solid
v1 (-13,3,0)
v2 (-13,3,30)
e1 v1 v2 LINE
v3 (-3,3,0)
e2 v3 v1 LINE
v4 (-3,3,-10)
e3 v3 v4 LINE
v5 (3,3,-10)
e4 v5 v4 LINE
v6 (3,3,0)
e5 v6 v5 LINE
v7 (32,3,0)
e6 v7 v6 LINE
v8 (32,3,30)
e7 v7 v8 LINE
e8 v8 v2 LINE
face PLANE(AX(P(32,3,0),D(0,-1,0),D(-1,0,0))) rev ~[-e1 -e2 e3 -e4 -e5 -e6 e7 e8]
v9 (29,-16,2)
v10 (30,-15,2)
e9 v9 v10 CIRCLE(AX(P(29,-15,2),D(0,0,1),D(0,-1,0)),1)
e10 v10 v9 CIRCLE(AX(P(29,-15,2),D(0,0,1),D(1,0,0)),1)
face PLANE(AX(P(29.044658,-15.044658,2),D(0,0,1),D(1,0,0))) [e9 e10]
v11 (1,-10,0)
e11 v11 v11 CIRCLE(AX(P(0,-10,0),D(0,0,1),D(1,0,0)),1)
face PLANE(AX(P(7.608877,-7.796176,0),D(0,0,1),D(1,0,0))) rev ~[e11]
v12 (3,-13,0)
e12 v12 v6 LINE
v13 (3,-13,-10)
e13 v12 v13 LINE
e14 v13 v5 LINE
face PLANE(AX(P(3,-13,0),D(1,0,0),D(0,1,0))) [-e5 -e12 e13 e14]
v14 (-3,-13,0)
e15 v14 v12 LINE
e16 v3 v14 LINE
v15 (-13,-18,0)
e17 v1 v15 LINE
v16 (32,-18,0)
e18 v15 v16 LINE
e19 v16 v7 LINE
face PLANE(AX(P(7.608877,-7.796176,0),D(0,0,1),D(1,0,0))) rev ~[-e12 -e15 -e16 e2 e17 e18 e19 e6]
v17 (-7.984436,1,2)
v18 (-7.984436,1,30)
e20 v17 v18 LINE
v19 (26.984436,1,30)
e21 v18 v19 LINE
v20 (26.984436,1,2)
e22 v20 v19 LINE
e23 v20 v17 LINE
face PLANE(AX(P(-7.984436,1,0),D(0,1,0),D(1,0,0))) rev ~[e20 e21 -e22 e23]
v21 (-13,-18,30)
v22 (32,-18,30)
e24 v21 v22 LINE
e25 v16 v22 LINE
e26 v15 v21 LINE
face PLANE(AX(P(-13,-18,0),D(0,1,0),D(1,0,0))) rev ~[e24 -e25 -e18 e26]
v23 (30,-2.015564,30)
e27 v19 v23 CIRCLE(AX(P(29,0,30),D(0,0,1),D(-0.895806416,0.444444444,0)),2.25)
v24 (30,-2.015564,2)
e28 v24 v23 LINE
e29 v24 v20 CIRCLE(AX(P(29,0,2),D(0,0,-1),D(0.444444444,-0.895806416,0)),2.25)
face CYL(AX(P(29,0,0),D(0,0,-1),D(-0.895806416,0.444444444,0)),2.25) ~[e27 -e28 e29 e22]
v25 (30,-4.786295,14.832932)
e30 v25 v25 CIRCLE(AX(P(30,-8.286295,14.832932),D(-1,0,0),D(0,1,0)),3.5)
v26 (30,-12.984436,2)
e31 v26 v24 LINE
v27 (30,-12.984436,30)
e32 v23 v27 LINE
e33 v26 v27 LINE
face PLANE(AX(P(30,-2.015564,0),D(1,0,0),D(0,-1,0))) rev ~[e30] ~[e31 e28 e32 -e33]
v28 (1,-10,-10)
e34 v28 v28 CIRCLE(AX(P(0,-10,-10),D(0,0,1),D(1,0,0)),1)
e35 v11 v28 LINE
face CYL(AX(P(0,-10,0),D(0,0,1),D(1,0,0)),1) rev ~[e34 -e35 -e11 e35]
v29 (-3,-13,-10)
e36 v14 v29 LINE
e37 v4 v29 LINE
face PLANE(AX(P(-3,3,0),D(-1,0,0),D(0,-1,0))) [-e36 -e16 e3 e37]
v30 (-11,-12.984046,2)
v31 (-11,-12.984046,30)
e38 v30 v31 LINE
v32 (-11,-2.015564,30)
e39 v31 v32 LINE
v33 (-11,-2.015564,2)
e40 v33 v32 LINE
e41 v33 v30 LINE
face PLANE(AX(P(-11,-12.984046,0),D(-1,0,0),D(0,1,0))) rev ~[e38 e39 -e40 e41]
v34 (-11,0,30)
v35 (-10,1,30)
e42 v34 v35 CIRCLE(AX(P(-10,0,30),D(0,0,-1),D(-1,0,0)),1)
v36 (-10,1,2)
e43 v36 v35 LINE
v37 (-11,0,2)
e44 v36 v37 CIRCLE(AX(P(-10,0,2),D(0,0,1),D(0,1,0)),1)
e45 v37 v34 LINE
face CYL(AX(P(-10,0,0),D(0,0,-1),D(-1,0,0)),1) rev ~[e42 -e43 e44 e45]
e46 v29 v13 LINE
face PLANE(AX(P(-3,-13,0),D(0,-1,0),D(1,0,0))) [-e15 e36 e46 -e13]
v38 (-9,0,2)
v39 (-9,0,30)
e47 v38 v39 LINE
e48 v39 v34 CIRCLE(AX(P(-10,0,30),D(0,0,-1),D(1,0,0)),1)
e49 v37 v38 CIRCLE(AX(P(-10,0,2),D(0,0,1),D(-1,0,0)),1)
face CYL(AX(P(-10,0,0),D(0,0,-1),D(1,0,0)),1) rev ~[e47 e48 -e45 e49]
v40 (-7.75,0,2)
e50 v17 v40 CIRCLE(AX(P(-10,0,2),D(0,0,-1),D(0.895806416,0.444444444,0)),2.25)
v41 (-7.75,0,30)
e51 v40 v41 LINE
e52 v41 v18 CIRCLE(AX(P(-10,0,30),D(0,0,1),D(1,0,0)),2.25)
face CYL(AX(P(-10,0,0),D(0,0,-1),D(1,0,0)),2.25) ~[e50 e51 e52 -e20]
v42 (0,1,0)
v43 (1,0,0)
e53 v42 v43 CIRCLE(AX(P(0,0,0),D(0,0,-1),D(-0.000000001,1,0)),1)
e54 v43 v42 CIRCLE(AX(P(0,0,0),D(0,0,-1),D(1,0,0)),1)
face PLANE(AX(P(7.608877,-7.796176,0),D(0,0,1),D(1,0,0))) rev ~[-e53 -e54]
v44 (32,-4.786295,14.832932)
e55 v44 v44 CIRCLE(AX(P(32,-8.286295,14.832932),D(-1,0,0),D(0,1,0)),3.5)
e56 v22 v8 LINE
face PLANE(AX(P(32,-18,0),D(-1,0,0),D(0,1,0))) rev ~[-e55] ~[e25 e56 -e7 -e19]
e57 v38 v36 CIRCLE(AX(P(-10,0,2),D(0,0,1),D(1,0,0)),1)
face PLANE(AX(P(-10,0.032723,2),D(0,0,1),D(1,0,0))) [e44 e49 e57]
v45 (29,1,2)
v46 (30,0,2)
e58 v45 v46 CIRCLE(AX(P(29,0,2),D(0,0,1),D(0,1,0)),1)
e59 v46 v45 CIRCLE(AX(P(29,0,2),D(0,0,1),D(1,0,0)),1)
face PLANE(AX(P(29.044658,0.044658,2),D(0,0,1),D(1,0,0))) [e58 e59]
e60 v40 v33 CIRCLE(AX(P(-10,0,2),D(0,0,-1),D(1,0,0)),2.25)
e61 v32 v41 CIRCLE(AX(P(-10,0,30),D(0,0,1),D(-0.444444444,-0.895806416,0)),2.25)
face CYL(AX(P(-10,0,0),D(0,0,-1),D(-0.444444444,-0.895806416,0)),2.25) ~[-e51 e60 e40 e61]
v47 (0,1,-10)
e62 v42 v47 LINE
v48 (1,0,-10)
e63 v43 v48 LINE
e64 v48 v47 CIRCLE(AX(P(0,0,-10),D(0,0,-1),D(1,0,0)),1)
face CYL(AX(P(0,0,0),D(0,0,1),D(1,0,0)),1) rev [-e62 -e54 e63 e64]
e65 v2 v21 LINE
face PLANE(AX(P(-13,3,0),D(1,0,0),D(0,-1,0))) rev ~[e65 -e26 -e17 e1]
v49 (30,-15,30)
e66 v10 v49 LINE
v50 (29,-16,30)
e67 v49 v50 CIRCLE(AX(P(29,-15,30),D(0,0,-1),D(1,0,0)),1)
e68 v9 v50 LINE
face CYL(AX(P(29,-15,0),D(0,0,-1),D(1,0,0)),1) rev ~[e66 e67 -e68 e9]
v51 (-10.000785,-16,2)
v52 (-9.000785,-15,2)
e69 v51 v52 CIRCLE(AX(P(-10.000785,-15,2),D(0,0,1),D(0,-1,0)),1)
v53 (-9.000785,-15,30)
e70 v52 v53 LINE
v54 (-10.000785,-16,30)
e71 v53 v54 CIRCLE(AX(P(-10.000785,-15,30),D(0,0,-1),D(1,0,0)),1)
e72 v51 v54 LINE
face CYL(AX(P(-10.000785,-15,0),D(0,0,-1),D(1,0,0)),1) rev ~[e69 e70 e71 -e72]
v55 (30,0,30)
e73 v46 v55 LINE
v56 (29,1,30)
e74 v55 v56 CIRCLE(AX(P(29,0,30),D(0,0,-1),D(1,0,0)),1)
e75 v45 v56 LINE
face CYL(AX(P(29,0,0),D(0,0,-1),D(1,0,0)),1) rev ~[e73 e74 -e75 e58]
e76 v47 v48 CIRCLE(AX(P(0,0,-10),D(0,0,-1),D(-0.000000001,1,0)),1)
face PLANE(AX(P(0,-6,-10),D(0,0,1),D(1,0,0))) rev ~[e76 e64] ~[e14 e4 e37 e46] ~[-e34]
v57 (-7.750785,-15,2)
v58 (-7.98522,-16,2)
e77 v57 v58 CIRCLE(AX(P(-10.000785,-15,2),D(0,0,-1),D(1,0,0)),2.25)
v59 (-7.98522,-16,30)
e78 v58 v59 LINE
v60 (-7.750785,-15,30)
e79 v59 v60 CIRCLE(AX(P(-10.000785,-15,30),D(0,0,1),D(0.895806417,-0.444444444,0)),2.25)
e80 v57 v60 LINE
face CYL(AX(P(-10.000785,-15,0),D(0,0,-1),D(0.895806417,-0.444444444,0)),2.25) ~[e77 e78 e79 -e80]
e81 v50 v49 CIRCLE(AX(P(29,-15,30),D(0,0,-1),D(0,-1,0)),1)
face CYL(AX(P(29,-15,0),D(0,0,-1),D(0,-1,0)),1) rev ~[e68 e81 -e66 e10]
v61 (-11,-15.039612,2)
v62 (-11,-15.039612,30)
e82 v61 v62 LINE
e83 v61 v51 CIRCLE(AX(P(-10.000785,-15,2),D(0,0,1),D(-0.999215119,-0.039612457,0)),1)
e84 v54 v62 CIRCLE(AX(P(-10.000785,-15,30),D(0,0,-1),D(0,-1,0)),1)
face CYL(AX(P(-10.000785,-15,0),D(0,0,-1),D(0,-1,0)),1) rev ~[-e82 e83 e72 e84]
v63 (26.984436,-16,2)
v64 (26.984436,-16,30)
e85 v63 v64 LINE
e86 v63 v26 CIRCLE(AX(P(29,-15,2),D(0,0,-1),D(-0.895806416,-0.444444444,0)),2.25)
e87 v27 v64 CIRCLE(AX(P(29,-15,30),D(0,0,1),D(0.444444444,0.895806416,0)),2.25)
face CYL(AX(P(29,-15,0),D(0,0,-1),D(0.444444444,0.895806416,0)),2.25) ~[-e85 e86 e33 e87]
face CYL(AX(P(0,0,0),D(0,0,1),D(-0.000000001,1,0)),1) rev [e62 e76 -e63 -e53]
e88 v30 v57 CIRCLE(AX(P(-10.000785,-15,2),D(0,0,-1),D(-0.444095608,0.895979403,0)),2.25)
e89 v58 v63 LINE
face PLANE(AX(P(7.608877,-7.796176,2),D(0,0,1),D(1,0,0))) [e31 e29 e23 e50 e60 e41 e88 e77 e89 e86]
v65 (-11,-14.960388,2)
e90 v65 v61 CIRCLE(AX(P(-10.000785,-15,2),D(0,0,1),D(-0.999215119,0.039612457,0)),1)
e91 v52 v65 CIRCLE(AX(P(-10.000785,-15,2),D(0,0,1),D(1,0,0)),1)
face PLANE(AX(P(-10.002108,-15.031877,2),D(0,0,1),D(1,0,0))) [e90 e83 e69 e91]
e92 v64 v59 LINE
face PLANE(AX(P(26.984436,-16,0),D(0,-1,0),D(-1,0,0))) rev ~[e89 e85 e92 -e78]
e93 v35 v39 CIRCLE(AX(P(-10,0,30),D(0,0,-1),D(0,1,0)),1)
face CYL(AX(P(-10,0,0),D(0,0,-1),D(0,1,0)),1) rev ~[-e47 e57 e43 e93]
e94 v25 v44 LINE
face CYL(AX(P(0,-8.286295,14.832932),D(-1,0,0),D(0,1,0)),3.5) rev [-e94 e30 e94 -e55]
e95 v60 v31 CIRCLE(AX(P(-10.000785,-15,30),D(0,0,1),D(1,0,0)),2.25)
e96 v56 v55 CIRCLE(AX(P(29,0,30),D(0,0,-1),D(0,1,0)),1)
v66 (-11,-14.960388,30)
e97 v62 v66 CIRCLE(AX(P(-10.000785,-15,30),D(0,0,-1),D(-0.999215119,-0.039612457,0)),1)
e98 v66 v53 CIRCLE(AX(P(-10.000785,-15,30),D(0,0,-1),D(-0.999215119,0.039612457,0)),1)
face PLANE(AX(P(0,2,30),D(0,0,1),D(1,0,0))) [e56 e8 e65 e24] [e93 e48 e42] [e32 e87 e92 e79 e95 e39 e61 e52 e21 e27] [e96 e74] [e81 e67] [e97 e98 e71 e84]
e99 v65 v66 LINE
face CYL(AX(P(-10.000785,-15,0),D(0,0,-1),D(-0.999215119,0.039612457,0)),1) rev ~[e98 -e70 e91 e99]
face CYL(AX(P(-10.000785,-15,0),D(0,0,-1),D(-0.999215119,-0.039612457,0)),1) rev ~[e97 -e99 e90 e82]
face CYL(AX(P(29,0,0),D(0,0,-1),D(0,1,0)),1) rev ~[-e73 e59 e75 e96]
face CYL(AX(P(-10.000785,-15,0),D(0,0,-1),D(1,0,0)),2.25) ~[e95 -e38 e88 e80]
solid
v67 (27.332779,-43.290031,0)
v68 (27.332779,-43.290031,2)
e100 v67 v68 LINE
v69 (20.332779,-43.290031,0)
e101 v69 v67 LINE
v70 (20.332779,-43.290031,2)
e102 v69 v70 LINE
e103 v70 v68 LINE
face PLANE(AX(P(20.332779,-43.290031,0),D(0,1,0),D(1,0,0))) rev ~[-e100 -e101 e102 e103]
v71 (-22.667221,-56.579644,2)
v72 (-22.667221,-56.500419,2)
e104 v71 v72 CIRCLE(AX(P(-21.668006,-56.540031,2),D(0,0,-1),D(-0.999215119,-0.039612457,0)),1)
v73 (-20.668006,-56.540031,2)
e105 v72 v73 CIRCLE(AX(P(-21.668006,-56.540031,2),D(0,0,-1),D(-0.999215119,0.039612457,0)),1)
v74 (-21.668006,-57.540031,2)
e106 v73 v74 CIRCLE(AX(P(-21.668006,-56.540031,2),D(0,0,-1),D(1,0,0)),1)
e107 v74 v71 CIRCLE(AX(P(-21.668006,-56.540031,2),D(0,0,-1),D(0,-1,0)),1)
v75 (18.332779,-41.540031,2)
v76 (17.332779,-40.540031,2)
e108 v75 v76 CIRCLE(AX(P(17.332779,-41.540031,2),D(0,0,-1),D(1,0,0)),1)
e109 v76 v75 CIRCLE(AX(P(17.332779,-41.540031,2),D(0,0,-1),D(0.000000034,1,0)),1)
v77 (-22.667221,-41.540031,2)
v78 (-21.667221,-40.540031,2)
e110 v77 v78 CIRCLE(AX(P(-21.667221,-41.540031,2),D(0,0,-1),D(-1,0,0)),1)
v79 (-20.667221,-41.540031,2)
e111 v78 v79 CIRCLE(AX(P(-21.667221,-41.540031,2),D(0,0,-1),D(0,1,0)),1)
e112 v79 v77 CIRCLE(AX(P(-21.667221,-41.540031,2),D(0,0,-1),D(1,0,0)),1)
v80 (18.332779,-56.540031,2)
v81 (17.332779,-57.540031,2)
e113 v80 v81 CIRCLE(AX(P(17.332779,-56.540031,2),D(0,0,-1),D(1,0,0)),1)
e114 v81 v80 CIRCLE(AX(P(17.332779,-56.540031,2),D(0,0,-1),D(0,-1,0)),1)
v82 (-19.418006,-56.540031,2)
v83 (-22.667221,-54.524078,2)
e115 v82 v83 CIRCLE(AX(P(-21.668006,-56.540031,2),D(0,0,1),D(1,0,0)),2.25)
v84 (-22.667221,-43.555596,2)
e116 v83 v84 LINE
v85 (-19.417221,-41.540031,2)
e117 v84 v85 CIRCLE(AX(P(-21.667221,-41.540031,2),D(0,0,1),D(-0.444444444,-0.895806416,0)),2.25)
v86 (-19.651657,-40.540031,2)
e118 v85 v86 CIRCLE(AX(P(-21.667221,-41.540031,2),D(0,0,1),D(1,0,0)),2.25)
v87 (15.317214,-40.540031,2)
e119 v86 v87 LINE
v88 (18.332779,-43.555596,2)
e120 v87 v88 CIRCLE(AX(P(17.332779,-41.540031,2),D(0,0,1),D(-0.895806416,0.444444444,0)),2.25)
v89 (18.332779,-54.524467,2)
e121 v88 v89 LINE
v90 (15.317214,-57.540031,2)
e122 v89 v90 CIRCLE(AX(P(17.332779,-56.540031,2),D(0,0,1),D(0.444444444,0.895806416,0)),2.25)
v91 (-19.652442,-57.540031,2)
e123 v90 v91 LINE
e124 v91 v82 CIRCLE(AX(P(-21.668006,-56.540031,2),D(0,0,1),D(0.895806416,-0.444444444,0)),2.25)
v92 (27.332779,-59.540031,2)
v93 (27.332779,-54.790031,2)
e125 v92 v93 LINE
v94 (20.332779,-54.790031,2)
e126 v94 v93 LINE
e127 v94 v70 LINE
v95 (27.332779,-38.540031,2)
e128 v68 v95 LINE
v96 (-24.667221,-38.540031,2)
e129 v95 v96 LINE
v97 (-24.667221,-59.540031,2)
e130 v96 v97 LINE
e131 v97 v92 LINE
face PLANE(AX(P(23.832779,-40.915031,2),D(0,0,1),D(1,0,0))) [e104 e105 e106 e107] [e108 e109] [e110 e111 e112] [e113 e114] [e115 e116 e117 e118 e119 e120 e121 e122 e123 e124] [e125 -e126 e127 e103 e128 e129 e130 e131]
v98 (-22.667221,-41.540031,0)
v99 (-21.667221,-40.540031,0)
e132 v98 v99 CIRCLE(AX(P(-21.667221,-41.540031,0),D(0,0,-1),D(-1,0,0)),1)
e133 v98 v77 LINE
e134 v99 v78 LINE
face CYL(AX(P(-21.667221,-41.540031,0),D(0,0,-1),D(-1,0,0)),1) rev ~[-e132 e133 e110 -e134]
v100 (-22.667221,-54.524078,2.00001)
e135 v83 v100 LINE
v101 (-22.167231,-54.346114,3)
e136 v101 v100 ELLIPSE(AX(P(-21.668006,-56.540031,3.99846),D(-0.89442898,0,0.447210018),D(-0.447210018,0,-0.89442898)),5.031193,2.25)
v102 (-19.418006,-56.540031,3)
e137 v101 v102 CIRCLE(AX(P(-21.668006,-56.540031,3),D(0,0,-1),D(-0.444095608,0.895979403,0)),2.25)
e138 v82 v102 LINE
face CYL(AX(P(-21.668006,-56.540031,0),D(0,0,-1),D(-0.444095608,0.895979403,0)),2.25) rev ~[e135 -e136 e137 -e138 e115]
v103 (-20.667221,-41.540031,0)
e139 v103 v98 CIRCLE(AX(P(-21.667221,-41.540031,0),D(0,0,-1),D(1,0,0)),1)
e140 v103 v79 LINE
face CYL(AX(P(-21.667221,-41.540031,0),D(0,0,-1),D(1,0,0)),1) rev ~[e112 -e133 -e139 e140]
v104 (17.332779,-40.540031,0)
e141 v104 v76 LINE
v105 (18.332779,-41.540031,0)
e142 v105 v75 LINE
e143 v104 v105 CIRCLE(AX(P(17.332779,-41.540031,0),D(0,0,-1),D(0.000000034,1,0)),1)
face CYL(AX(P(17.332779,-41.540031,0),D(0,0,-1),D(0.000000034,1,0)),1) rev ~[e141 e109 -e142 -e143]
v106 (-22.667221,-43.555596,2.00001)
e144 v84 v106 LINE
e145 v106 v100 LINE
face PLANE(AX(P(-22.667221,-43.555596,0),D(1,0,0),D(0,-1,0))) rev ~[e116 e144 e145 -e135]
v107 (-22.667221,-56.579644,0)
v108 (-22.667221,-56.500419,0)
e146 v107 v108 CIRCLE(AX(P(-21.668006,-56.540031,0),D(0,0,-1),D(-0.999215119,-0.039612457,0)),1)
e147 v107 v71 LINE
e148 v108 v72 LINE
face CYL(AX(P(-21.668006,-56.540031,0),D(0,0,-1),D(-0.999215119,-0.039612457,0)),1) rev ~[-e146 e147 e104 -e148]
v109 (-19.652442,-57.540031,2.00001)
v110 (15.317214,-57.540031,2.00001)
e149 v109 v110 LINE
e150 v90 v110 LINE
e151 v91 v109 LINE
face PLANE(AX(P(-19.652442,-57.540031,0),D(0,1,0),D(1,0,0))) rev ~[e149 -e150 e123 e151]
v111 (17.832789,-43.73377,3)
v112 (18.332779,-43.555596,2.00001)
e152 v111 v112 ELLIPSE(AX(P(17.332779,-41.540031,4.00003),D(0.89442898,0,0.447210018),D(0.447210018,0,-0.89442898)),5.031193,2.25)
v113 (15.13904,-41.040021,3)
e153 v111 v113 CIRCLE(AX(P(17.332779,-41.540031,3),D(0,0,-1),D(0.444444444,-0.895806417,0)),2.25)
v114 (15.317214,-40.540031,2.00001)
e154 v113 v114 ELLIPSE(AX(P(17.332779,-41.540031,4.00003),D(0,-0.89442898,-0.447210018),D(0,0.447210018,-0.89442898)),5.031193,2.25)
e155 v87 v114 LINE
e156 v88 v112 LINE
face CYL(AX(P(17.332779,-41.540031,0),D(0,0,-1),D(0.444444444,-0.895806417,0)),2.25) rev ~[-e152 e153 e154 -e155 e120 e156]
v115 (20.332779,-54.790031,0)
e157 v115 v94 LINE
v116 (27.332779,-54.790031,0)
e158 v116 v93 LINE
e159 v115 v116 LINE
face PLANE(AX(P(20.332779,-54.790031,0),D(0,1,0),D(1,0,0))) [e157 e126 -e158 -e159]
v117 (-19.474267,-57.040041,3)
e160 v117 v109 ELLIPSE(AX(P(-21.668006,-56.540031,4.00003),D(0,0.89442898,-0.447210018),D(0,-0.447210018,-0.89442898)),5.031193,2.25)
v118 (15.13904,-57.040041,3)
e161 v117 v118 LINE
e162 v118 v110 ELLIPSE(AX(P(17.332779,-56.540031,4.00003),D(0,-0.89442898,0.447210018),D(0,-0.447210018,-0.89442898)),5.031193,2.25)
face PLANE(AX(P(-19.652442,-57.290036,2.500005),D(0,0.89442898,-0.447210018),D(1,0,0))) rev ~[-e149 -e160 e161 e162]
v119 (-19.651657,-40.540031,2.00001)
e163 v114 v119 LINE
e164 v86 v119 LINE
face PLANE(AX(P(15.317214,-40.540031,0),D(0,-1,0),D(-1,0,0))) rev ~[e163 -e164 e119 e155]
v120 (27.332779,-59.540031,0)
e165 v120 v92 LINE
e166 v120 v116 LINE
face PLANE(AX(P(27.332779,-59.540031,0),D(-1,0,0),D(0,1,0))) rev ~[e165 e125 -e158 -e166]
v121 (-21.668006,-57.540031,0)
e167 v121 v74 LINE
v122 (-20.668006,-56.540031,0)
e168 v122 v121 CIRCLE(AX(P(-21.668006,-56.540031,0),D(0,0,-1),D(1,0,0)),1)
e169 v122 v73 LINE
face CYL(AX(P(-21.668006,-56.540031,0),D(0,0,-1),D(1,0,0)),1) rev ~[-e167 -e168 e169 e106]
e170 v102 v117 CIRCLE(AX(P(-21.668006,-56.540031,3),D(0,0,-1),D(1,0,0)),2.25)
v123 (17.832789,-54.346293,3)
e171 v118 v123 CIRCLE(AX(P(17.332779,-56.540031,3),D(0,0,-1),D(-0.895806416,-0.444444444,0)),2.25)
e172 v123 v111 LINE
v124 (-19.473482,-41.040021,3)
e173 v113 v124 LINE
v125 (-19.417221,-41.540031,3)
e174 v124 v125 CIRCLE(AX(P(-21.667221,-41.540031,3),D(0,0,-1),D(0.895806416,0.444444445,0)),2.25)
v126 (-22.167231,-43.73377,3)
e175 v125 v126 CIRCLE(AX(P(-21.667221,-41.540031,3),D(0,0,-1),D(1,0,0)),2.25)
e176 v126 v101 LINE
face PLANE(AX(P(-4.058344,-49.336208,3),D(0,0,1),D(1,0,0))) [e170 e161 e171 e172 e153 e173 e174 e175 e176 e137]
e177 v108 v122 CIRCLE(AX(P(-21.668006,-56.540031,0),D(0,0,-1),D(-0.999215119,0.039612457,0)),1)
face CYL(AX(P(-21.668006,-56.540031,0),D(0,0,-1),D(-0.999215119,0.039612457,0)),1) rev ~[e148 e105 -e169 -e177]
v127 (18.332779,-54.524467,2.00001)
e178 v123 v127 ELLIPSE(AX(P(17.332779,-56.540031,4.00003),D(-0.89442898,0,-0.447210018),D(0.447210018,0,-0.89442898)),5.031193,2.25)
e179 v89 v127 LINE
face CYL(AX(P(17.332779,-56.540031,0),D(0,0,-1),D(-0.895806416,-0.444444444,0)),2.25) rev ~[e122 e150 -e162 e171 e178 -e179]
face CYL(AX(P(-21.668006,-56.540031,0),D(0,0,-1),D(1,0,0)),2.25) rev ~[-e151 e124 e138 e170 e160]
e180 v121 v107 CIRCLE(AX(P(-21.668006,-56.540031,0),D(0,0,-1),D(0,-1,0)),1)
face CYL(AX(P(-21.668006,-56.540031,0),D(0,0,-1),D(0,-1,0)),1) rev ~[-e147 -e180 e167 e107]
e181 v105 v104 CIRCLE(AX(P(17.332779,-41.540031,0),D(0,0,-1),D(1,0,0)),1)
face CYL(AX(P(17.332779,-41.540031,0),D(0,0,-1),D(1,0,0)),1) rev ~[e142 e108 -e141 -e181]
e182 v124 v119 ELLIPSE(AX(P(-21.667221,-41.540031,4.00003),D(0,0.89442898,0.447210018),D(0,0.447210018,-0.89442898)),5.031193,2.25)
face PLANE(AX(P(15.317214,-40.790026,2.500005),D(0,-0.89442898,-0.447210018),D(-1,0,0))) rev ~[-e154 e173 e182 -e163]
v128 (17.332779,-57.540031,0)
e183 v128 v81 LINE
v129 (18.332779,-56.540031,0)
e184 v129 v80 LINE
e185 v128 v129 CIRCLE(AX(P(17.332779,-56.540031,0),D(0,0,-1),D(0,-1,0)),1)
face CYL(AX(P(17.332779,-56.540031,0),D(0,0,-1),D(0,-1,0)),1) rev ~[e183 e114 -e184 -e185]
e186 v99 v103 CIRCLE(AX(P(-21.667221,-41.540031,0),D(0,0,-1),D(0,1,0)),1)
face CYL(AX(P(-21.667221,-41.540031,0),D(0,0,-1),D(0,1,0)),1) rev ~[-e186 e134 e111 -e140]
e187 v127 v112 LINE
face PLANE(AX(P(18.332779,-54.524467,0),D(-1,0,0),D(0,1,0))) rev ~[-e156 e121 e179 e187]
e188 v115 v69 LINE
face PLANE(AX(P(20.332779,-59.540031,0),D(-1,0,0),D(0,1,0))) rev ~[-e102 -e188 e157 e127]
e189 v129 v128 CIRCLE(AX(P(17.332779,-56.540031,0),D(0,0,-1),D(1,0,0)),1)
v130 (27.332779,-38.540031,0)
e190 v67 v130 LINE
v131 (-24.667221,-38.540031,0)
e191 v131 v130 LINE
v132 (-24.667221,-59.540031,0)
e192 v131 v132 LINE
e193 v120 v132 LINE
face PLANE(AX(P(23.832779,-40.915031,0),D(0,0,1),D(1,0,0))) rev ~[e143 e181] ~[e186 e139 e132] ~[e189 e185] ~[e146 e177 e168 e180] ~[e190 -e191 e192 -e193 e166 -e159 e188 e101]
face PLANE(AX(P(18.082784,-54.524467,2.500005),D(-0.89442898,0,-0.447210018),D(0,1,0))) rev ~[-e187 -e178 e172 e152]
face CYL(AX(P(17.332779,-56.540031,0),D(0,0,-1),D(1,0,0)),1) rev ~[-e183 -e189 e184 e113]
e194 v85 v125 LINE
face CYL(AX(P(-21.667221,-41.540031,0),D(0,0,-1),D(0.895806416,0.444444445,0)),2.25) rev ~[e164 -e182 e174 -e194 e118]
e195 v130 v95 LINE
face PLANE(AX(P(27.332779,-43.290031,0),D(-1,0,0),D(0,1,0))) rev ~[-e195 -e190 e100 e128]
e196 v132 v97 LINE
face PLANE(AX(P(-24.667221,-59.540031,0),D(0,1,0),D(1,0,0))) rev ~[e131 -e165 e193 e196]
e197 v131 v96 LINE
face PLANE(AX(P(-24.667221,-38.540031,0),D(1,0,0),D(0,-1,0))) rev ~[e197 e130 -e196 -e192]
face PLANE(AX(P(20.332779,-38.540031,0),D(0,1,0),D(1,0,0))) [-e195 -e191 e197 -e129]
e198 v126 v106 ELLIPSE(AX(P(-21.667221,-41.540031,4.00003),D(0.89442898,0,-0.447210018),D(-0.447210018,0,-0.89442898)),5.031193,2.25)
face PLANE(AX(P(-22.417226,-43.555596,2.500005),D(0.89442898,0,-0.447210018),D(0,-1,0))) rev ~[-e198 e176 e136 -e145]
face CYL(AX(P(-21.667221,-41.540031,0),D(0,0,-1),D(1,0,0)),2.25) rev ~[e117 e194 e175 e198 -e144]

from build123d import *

# Parameters (mm, degrees)
F1_DEPTH = 30
F0_R     = 1
F2_DEPTH = 2
F3_DEPTH = 10
F4_DEPTH = 2
F5_DEPTH = 3
F6_SIZE2 = 0.99999
F6_SIZE  = 0.49999
F7_R     = 3.5
F8_DEPTH = 40
F0_W     = 7
F0_H     = 4.75
F9_DEPTH = 2


# Not quite as in the source:
# - a fillet or chamfer is up to 0.001 mm smaller than in the source, because OpenCascade refuses the exact size


with BuildPart() as f1:
    # F0 (on Top) → F1 (new body)
    with BuildSketch(Plane.XY):
        Polygon((-3, 1), (-1.2e-09, 1), (3, 1), (3, 3), (-3, 3), align=None)
        with BuildLine():
            Line((-7.9844355629, 1), (-3, 1))
            Line((-3, 1), (-3, 3))
            Line((-3, 3), (-13, 3))
            Line((-13, 3), (-13, -18))
            Line((-13, -18), (32, -18))
            Line((32, -18), (32, 3))
            Line((32, 3), (3, 3))
            Line((3, 3), (3, 1))
            Line((3, 1), (26.9844355629, 1))
            ThreePointArc((26.9844355629, 1), (29.5135562367, 2.1906072199), (31.25, 0))
            ThreePointArc((31.25, 0), (30.9121323176, -1.1858541226), (30, -2.0155644371))
            Line((30, -2.0155644371), (30, -12.9844355629))
            ThreePointArc((30, -12.9844355629), (30.9121323176, -13.8141458774), (31.25, -15))
            ThreePointArc((31.25, -15), (29.5135562367, -17.1906072199), (26.9844355629, -16))
            Line((26.9844355629, -16), (-7.9852204443, -16))
            ThreePointArc((-7.9852204443, -16), (-11.592084853, -16.5906804835), (-11, -12.9840463431))
            Line((-11, -12.9840463431), (-11, -2.0155644371))
            ThreePointArc((-11, -2.0155644371), (-11.5909902577, 1.5909902577), (-7.9844355629, 1))
        make_face()
        with BuildLine():
            ThreePointArc((-7.75, 0), (-7.8093927801, 0.5135562367), (-7.9844355629, 1))
            Line((-7.9844355629, 1), (-10, 1))
            ThreePointArc((-10, 1), (-9.2928932188, 0.7071067812), (-9, 0))
            ThreePointArc((-9, 0), (-10, -1), (-11, 0))
            Line((-11, 0), (-11, -2.0155644371))
            ThreePointArc((-11, -2.0155644371), (-8.8141458774, -1.9121323176), (-7.75, 0))
        make_face()
        with BuildLine():
            Line((-10, 1), (-7.9844355629, 1))
            ThreePointArc((-7.9844355629, 1), (-11.5909902577, 1.5909902577), (-11, -2.0155644371))
            Line((-11, -2.0155644371), (-11, 0))
            Line((-11, 0), (-11, 1))
            Line((-11, 1), (-10, 1))
        make_face()
        with BuildLine():
            ThreePointArc((31.25, 0), (29.5135562367, 2.1906072199), (26.9844355629, 1))
            Line((26.9844355629, 1), (29, 1))
            Line((29, 1), (30, 1))
            Line((30, 1), (30, 0))
            Line((30, 0), (30, -2.0155644371))
            ThreePointArc((30, -2.0155644371), (30.9121323176, -1.1858541226), (31.25, 0))
        make_face()
        with BuildLine():
            Line((29, 1), (26.9844355629, 1))
            ThreePointArc((26.9844355629, 1), (27.4090097423, -1.5909902577), (30, -2.0155644371))
            Line((30, -2.0155644371), (30, 0))
            ThreePointArc((30, 0), (28.2928932188, -0.7071067812), (29, 1))
        make_face()
        with BuildLine():
            Line((30, 1), (29, 1))
            ThreePointArc((29, 1), (29.7071067812, 0.7071067812), (30, 0))
            Line((30, 0), (30, 1))
        make_face()
        with BuildLine():
            ThreePointArc((-11, 0), (-10.7071067812, 0.7071067812), (-10, 1))
            Line((-10, 1), (-11, 1))
            Line((-11, 1), (-11, 0))
        make_face()
        with BuildLine():
            ThreePointArc((-10.0007848814, -16), (-10.6937450327, -15.7209758864), (-11, -15.0396124575))
            Line((-11, -15.0396124575), (-11, -16))
            Line((-11, -16), (-10.0007848814, -16))
        make_face()
        with BuildLine():
            Line((-11, -14.9603875425), (-11, -12.9840463431))
            ThreePointArc((-11, -12.9840463431), (-11.592084853, -16.5906804835), (-7.9852204443, -16))
            Line((-7.9852204443, -16), (-10.0007848814, -16))
            Line((-10.0007848814, -16), (-11, -16))
            Line((-11, -16), (-11, -15.0396124575))
            ThreePointArc((-11, -15.0396124575), (-11.0007848814, -15), (-11, -14.9603875425))
        make_face()
        with BuildLine():
            ThreePointArc((-7.7507848814, -15), (-8.8145585153, -13.0880985882), (-11, -12.9840463431))
            Line((-11, -12.9840463431), (-11, -14.9603875425))
            ThreePointArc((-11, -14.9603875425), (-9.9809747651, -14.0001962396), (-9.0007848814, -15))
            ThreePointArc((-9.0007848814, -15), (-9.2936781002, -15.7071067812), (-10.0007848814, -16))
            Line((-10.0007848814, -16), (-7.9852204443, -16))
            ThreePointArc((-7.9852204443, -16), (-7.8101776616, -15.5135562367), (-7.7507848814, -15))
        make_face()
        with BuildLine():
            Line((30, -16), (30, -15))
            ThreePointArc((30, -15), (29.7071067812, -15.7071067812), (29, -16))
            Line((29, -16), (30, -16))
        make_face()
        with BuildLine():
            Line((30, -15), (30, -12.9844355629))
            ThreePointArc((30, -12.9844355629), (27.4090097423, -13.4090097423), (26.9844355629, -16))
            Line((26.9844355629, -16), (29, -16))
            ThreePointArc((29, -16), (28.2928932188, -14.2928932188), (30, -15))
        make_face()
        with BuildLine():
            ThreePointArc((31.25, -15), (30.9121323176, -13.8141458774), (30, -12.9844355629))
            Line((30, -12.9844355629), (30, -15))
            Line((30, -15), (30, -16))
            Line((30, -16), (29, -16))
            Line((29, -16), (26.9844355629, -16))
            ThreePointArc((26.9844355629, -16), (29.5135562367, -17.1906072199), (31.25, -15))
        make_face()
    extrude(amount=F1_DEPTH)

    # F0 (on Top) → F2 (join)
    with BuildSketch(Plane.XY):
        with BuildLine():
            Line((-3, -13), (-3, 1))
            Line((-3, 1), (-7.9844355629, 1))
            ThreePointArc((-7.9844355629, 1), (-7.8093927801, 0.5135562367), (-7.75, 0))
            ThreePointArc((-7.75, 0), (-8.8141458774, -1.9121323176), (-11, -2.0155644371))
            Line((-11, -2.0155644371), (-11, -12.9840463431))
            ThreePointArc((-11, -12.9840463431), (-8.8145585153, -13.0880985882), (-7.7507848814, -15))
            ThreePointArc((-7.7507848814, -15), (-7.8101776616, -15.5135562367), (-7.9852204443, -16))
            Line((-7.9852204443, -16), (26.9844355629, -16))
            ThreePointArc((26.9844355629, -16), (27.4090097423, -13.4090097423), (30, -12.9844355629))
            Line((30, -12.9844355629), (30, -2.0155644371))
            ThreePointArc((30, -2.0155644371), (27.4090097423, -1.5909902577), (26.9844355629, 1))
            Line((26.9844355629, 1), (3, 1))
            Line((3, 1), (3, -13))
            Line((3, -13), (-3, -13))
        make_face()
        Polygon((3, 1), (-1.2e-09, 1), (-3, 1), (-3, -13), (3, -13), align=None)
        with Locations((0, -10)):
            Circle(F0_R, mode=Mode.SUBTRACT)
        with BuildLine():
            ThreePointArc((-1.2e-09, 1), (0.7071067808, 0.7071067816), (1, 0))
            ThreePointArc((1, 0), (-0.7071067808, -0.7071067816), (-1.2e-09, 1))
        make_face(mode=Mode.SUBTRACT)
        with BuildLine():
            ThreePointArc((-1.2e-09, 1), (-0.7071067808, -0.7071067816), (1, 0))
            ThreePointArc((1, 0), (0.7071067808, 0.7071067816), (-1.2e-09, 1))
        make_face()
        with BuildLine():
            ThreePointArc((-9, 0), (-9.2928932188, 0.7071067812), (-10, 1))
            ThreePointArc((-10, 1), (-10.7071067812, 0.7071067812), (-11, 0))
            ThreePointArc((-11, 0), (-10, -1), (-9, 0))
        make_face()
        with BuildLine():
            ThreePointArc((30, 0), (29.7071067812, 0.7071067812), (29, 1))
            ThreePointArc((29, 1), (28.2928932188, -0.7071067812), (30, 0))
        make_face()
        with BuildLine():
            ThreePointArc((29, -16), (29.7071067812, -15.7071067812), (30, -15))
            ThreePointArc((30, -15), (28.2928932188, -14.2928932188), (29, -16))
        make_face()
        with Locations((0, -10)):
            Circle(F0_R)
        with BuildLine():
            ThreePointArc((-9.0007848814, -15), (-9.9809747651, -14.0001962396), (-11, -14.9603875425))
            Line((-11, -14.9603875425), (-11, -15.0396124575))
            ThreePointArc((-11, -15.0396124575), (-10.6937450327, -15.7209758864), (-10.0007848814, -16))
            ThreePointArc((-10.0007848814, -16), (-9.2936781002, -15.7071067812), (-9.0007848814, -15))
        make_face()
        with BuildLine():
            Line((-11, -15.0396124575), (-11, -14.9603875425))
            ThreePointArc((-11, -14.9603875425), (-11.0007848814, -15), (-11, -15.0396124575))
        make_face()
    extrude(amount=F2_DEPTH)

    # F0 (on Top) → F3 (join)
    with BuildSketch(Plane.XY):
        Polygon((3, 1), (-1.2e-09, 1), (-3, 1), (-3, -13), (3, -13), align=None)
        with Locations((0, -10)):
            Circle(F0_R, mode=Mode.SUBTRACT)
        with BuildLine():
            ThreePointArc((-1.2e-09, 1), (0.7071067808, 0.7071067816), (1, 0))
            ThreePointArc((1, 0), (-0.7071067808, -0.7071067816), (-1.2e-09, 1))
        make_face(mode=Mode.SUBTRACT)
        Polygon((-3, 1), (-1.2e-09, 1), (3, 1), (3, 3), (-3, 3), align=None)
    extrude(amount=-F3_DEPTH)

    # F7 (on Right) → F8 (cut)
    with BuildSketch(Plane.YZ):
        with Locations((-8.2862954587, 14.8329315707)):
            Circle(F7_R)
    extrude(amount=F8_DEPTH, mode=Mode.SUBTRACT)


with BuildPart() as f4:
    # F0 (on Top) → F4 (new body)
    with BuildSketch(Plane.XY):
        with BuildLine():
            Line((-19.6516566587, -40.5400313383), (-14.6672210958, -40.5400313383))
            Line((-14.6672210958, -40.5400313383), (-14.6672210958, -38.5400313383))
            Line((-14.6672210958, -38.5400313383), (-24.6672210958, -38.5400313383))
            Line((-24.6672210958, -38.5400313383), (-24.6672210958, -59.5400313383))
            Line((-24.6672210958, -59.5400313383), (20.3327789042, -59.5400313383))
            Line((20.3327789042, -59.5400313383), (20.3327789042, -54.7900313383))
            Line((20.3327789042, -54.7900313383), (20.3327789042, -43.2900313383))
            Line((20.3327789042, -43.2900313383), (20.3327789042, -38.5400313383))
            Line((20.3327789042, -38.5400313383), (-8.6672210958, -38.5400313383))
            Line((-8.6672210958, -38.5400313383), (-8.6672210958, -40.5400313383))
            Line((-8.6672210958, -40.5400313383), (15.3172144672, -40.5400313383))
            ThreePointArc((15.3172144672, -40.5400313383), (17.846335141, -39.3494241184), (19.5827789042, -41.5400313383))
            ThreePointArc((19.5827789042, -41.5400313383), (19.2449112218, -42.7258854608), (18.3327789042, -43.5555957754))
            Line((18.3327789042, -43.5555957754), (18.3327789042, -54.5244669012))
            ThreePointArc((18.3327789042, -54.5244669012), (19.2449112218, -55.3541772157), (19.5827789042, -56.5400313383))
            ThreePointArc((19.5827789042, -56.5400313383), (17.846335141, -58.7306385581), (15.3172144672, -57.5400313383))
            Line((15.3172144672, -57.5400313383), (-19.6524415401, -57.5400313383))
            ThreePointArc((-19.6524415401, -57.5400313383), (-23.2593059487, -58.1307118218), (-22.6672210958, -54.5240776814))
            Line((-22.6672210958, -54.5240776814), (-22.6672210958, -43.5555957754))
            ThreePointArc((-22.6672210958, -43.5555957754), (-23.2582113534, -39.9490410806), (-19.6516566587, -40.5400313383))
        make_face()
        Polygon((-14.6672210958, -40.5400313383), (-11.6672210958, -40.5400313383), (-8.6672210958, -40.5400313383), (-8.6672210958, -38.5400313383), (-14.6672210958, -38.5400313383), align=None)
        with BuildLine():
            ThreePointArc((-19.4172210958, -41.5400313383), (-19.4766138759, -41.0264751015), (-19.6516566587, -40.5400313383))
            Line((-19.6516566587, -40.5400313383), (-21.6672210958, -40.5400313383))
            ThreePointArc((-21.6672210958, -40.5400313383), (-20.9601143146, -40.8329245571), (-20.6672210958, -41.5400313383))
            ThreePointArc((-20.6672210958, -41.5400313383), (-21.6672210958, -42.5400313383), (-22.6672210958, -41.5400313383))
            Line((-22.6672210958, -41.5400313383), (-22.6672210958, -43.5555957754))
            ThreePointArc((-22.6672210958, -43.5555957754), (-20.4813669732, -43.4521636559), (-19.4172210958, -41.5400313383))
        make_face()
        with BuildLine():
            ThreePointArc((-19.4180059772, -56.5400313383), (-20.4817796111, -54.6281299265), (-22.6672210958, -54.5240776814))
            Line((-22.6672210958, -54.5240776814), (-22.6672210958, -56.5004188808))
            ThreePointArc((-22.6672210958, -56.5004188808), (-21.6481958609, -55.5402275779), (-20.6680059772, -56.5400313383))
            ThreePointArc((-20.6680059772, -56.5400313383), (-20.960899196, -57.2471381195), (-21.6680059772, -57.5400313383))
            Line((-21.6680059772, -57.5400313383), (-19.6524415401, -57.5400313383))
            ThreePointArc((-19.6524415401, -57.5400313383), (-19.4773987573, -57.053587575), (-19.4180059772, -56.5400313383))
        make_face()
        with BuildLine():
            ThreePointArc((19.5827789042, -41.5400313383), (17.846335141, -39.3494241184), (15.3172144672, -40.5400313383))
            Line((15.3172144672, -40.5400313383), (17.332778938, -40.5400313383))
            Line((17.332778938, -40.5400313383), (18.3327789042, -40.5400313383))
            Line((18.3327789042, -40.5400313383), (18.3327789042, -41.5400313383))
            Line((18.3327789042, -41.5400313383), (18.3327789042, -43.5555957754))
            ThreePointArc((18.3327789042, -43.5555957754), (19.2449112218, -42.7258854608), (19.5827789042, -41.5400313383))
        make_face()
        with BuildLine():
            Line((17.332778938, -40.5400313383), (15.3172144672, -40.5400313383))
            ThreePointArc((15.3172144672, -40.5400313383), (15.7417886466, -43.1310215959), (18.3327789042, -43.5555957754))
            Line((18.3327789042, -43.5555957754), (18.3327789042, -41.5400313383))
            ThreePointArc((18.3327789042, -41.5400313383), (16.6256721111, -42.2471381075), (17.332778938, -40.5400313383))
        make_face()
        with BuildLine():
            Line((18.3327789042, -56.5400313383), (18.3327789042, -54.5244669012))
            ThreePointArc((18.3327789042, -54.5244669012), (15.7417886466, -54.9490410806), (15.3172144672, -57.5400313383))
            Line((15.3172144672, -57.5400313383), (17.3327789042, -57.5400313383))
            ThreePointArc((17.3327789042, -57.5400313383), (16.6256721231, -55.8329245571), (18.3327789042, -56.5400313383))
        make_face()
        with BuildLine():
            Line((18.3327789042, -57.5400313383), (18.3327789042, -56.5400313383))
            ThreePointArc((18.3327789042, -56.5400313383), (18.0398856854, -57.2471381195), (17.3327789042, -57.5400313383))
            Line((17.3327789042, -57.5400313383), (18.3327789042, -57.5400313383))
        make_face()
        with BuildLine():
            ThreePointArc((19.5827789042, -56.5400313383), (19.2449112218, -55.3541772157), (18.3327789042, -54.5244669012))
            Line((18.3327789042, -54.5244669012), (18.3327789042, -56.5400313383))
            Line((18.3327789042, -56.5400313383), (18.3327789042, -57.5400313383))
            Line((18.3327789042, -57.5400313383), (17.3327789042, -57.5400313383))
            Line((17.3327789042, -57.5400313383), (15.3172144672, -57.5400313383))
            ThreePointArc((15.3172144672, -57.5400313383), (17.846335141, -58.7306385581), (19.5827789042, -56.5400313383))
        make_face()
        with BuildLine():
            Line((-22.6672210958, -56.5004188808), (-22.6672210958, -54.5240776814))
            ThreePointArc((-22.6672210958, -54.5240776814), (-23.2593059487, -58.1307118218), (-19.6524415401, -57.5400313383))
            Line((-19.6524415401, -57.5400313383), (-21.6680059772, -57.5400313383))
            Line((-21.6680059772, -57.5400313383), (-22.6672210958, -57.5400313383))
            Line((-22.6672210958, -57.5400313383), (-22.6672210958, -56.5796437958))
            ThreePointArc((-22.6672210958, -56.5796437958), (-22.6680059772, -56.5400313383), (-22.6672210958, -56.5004188808))
        make_face()
        with BuildLine():
            Line((-21.6672210958, -40.5400313383), (-19.6516566587, -40.5400313383))
            ThreePointArc((-19.6516566587, -40.5400313383), (-23.2582113534, -39.9490410806), (-22.6672210958, -43.5555957754))
            Line((-22.6672210958, -43.5555957754), (-22.6672210958, -41.5400313383))
            Line((-22.6672210958, -41.5400313383), (-22.6672210958, -40.5400313383))
            Line((-22.6672210958, -40.5400313383), (-21.6672210958, -40.5400313383))
        make_face()
        with BuildLine():
            ThreePointArc((-22.6672210958, -41.5400313383), (-22.3743278769, -40.8329245571), (-21.6672210958, -40.5400313383))
            Line((-21.6672210958, -40.5400313383), (-22.6672210958, -40.5400313383))
            Line((-22.6672210958, -40.5400313383), (-22.6672210958, -41.5400313383))
        make_face()
        with BuildLine():
            ThreePointArc((-21.6680059772, -57.5400313383), (-22.3609661284, -57.2610072247), (-22.6672210958, -56.5796437958))
            Line((-22.6672210958, -56.5796437958), (-22.6672210958, -57.5400313383))
            Line((-22.6672210958, -57.5400313383), (-21.6680059772, -57.5400313383))
        make_face()
        with BuildLine():
            Line((18.3327789042, -40.5400313383), (17.332778938, -40.5400313383))
            ThreePointArc((17.332778938, -40.5400313383), (18.0398856974, -40.832924569), (18.3327789042, -41.5400313383))
            Line((18.3327789042, -41.5400313383), (18.3327789042, -40.5400313383))
        make_face()
    extrude(amount=F4_DEPTH)

    # F0 (on Top) → F5 (join)
    with BuildSketch(Plane.XY):
        with BuildLine():
            Line((-14.6672210958, -54.5400313383), (-14.6672210958, -40.5400313383))
            Line((-14.6672210958, -40.5400313383), (-19.6516566587, -40.5400313383))
            ThreePointArc((-19.6516566587, -40.5400313383), (-19.4766138759, -41.0264751015), (-19.4172210958, -41.5400313383))
            ThreePointArc((-19.4172210958, -41.5400313383), (-20.4813669732, -43.4521636559), (-22.6672210958, -43.5555957754))
            Line((-22.6672210958, -43.5555957754), (-22.6672210958, -54.5240776814))
            ThreePointArc((-22.6672210958, -54.5240776814), (-20.4817796111, -54.6281299265), (-19.4180059772, -56.5400313383))
            ThreePointArc((-19.4180059772, -56.5400313383), (-19.4773987573, -57.053587575), (-19.6524415401, -57.5400313383))
            Line((-19.6524415401, -57.5400313383), (15.3172144672, -57.5400313383))
            ThreePointArc((15.3172144672, -57.5400313383), (15.7417886466, -54.9490410806), (18.3327789042, -54.5244669012))
            Line((18.3327789042, -54.5244669012), (18.3327789042, -43.5555957754))
            ThreePointArc((18.3327789042, -43.5555957754), (15.7417886466, -43.1310215959), (15.3172144672, -40.5400313383))
            Line((15.3172144672, -40.5400313383), (-8.6672210958, -40.5400313383))
            Line((-8.6672210958, -40.5400313383), (-8.6672210958, -54.5400313383))
            Line((-8.6672210958, -54.5400313383), (-14.6672210958, -54.5400313383))
        make_face()
        Polygon((-8.6672210958, -40.5400313383), (-11.6672210958, -40.5400313383), (-14.6672210958, -40.5400313383), (-14.6672210958, -54.5400313383), (-8.6672210958, -54.5400313383), align=None)
        with Locations((-11.6672210958, -51.5400313383)):
            Circle(F0_R, mode=Mode.SUBTRACT)
        with BuildLine():
            ThreePointArc((-11.6672210958, -40.5400313383), (-10.9601143146, -40.8329245571), (-10.6672210958, -41.5400313383))
            ThreePointArc((-10.6672210958, -41.5400313383), (-12.3743278769, -42.2471381195), (-11.6672210958, -40.5400313383))
        make_face(mode=Mode.SUBTRACT)
        with BuildLine():
            ThreePointArc((-11.6672210958, -40.5400313383), (-12.3743278769, -42.2471381195), (-10.6672210958, -41.5400313383))
            ThreePointArc((-10.6672210958, -41.5400313383), (-10.9601143146, -40.8329245571), (-11.6672210958, -40.5400313383))
        make_face()
        with Locations((-11.6672210958, -51.5400313383)):
            Circle(F0_R)
    extrude(amount=F5_DEPTH)

    # F6 (size 0.5 and 1 in the source; OpenCascade refuses exactly that, so slightly less here)
    f6_edges = [f4.edges().sort_by_distance(p)[0] for p in [
        (-2.167614, -57.540031, 3),
        (-22.667221, -49.039837, 3),
        (-2.167221, -40.540031, 3),
        (18.332779, -49.040031, 3),
    ]]
    f6_side = f4.faces().sort_by_distance((-2.167284, -49.040056, 3))[0]
    chamfer(f6_edges, length=F6_SIZE, length2=F6_SIZE2, reference=f6_side)

    # F0 (on Top) → F9 (join)
    with BuildSketch(Plane.XY):
        with Locations((23.8327789042, -40.9150313383)):
            Rectangle(F0_W, F0_H)
        with Locations((23.8327789042, -57.1650313383)):
            Rectangle(F0_W, F0_H)
    extrude(amount=F9_DEPTH)


solid = Compound([f1.part, f4.part])
